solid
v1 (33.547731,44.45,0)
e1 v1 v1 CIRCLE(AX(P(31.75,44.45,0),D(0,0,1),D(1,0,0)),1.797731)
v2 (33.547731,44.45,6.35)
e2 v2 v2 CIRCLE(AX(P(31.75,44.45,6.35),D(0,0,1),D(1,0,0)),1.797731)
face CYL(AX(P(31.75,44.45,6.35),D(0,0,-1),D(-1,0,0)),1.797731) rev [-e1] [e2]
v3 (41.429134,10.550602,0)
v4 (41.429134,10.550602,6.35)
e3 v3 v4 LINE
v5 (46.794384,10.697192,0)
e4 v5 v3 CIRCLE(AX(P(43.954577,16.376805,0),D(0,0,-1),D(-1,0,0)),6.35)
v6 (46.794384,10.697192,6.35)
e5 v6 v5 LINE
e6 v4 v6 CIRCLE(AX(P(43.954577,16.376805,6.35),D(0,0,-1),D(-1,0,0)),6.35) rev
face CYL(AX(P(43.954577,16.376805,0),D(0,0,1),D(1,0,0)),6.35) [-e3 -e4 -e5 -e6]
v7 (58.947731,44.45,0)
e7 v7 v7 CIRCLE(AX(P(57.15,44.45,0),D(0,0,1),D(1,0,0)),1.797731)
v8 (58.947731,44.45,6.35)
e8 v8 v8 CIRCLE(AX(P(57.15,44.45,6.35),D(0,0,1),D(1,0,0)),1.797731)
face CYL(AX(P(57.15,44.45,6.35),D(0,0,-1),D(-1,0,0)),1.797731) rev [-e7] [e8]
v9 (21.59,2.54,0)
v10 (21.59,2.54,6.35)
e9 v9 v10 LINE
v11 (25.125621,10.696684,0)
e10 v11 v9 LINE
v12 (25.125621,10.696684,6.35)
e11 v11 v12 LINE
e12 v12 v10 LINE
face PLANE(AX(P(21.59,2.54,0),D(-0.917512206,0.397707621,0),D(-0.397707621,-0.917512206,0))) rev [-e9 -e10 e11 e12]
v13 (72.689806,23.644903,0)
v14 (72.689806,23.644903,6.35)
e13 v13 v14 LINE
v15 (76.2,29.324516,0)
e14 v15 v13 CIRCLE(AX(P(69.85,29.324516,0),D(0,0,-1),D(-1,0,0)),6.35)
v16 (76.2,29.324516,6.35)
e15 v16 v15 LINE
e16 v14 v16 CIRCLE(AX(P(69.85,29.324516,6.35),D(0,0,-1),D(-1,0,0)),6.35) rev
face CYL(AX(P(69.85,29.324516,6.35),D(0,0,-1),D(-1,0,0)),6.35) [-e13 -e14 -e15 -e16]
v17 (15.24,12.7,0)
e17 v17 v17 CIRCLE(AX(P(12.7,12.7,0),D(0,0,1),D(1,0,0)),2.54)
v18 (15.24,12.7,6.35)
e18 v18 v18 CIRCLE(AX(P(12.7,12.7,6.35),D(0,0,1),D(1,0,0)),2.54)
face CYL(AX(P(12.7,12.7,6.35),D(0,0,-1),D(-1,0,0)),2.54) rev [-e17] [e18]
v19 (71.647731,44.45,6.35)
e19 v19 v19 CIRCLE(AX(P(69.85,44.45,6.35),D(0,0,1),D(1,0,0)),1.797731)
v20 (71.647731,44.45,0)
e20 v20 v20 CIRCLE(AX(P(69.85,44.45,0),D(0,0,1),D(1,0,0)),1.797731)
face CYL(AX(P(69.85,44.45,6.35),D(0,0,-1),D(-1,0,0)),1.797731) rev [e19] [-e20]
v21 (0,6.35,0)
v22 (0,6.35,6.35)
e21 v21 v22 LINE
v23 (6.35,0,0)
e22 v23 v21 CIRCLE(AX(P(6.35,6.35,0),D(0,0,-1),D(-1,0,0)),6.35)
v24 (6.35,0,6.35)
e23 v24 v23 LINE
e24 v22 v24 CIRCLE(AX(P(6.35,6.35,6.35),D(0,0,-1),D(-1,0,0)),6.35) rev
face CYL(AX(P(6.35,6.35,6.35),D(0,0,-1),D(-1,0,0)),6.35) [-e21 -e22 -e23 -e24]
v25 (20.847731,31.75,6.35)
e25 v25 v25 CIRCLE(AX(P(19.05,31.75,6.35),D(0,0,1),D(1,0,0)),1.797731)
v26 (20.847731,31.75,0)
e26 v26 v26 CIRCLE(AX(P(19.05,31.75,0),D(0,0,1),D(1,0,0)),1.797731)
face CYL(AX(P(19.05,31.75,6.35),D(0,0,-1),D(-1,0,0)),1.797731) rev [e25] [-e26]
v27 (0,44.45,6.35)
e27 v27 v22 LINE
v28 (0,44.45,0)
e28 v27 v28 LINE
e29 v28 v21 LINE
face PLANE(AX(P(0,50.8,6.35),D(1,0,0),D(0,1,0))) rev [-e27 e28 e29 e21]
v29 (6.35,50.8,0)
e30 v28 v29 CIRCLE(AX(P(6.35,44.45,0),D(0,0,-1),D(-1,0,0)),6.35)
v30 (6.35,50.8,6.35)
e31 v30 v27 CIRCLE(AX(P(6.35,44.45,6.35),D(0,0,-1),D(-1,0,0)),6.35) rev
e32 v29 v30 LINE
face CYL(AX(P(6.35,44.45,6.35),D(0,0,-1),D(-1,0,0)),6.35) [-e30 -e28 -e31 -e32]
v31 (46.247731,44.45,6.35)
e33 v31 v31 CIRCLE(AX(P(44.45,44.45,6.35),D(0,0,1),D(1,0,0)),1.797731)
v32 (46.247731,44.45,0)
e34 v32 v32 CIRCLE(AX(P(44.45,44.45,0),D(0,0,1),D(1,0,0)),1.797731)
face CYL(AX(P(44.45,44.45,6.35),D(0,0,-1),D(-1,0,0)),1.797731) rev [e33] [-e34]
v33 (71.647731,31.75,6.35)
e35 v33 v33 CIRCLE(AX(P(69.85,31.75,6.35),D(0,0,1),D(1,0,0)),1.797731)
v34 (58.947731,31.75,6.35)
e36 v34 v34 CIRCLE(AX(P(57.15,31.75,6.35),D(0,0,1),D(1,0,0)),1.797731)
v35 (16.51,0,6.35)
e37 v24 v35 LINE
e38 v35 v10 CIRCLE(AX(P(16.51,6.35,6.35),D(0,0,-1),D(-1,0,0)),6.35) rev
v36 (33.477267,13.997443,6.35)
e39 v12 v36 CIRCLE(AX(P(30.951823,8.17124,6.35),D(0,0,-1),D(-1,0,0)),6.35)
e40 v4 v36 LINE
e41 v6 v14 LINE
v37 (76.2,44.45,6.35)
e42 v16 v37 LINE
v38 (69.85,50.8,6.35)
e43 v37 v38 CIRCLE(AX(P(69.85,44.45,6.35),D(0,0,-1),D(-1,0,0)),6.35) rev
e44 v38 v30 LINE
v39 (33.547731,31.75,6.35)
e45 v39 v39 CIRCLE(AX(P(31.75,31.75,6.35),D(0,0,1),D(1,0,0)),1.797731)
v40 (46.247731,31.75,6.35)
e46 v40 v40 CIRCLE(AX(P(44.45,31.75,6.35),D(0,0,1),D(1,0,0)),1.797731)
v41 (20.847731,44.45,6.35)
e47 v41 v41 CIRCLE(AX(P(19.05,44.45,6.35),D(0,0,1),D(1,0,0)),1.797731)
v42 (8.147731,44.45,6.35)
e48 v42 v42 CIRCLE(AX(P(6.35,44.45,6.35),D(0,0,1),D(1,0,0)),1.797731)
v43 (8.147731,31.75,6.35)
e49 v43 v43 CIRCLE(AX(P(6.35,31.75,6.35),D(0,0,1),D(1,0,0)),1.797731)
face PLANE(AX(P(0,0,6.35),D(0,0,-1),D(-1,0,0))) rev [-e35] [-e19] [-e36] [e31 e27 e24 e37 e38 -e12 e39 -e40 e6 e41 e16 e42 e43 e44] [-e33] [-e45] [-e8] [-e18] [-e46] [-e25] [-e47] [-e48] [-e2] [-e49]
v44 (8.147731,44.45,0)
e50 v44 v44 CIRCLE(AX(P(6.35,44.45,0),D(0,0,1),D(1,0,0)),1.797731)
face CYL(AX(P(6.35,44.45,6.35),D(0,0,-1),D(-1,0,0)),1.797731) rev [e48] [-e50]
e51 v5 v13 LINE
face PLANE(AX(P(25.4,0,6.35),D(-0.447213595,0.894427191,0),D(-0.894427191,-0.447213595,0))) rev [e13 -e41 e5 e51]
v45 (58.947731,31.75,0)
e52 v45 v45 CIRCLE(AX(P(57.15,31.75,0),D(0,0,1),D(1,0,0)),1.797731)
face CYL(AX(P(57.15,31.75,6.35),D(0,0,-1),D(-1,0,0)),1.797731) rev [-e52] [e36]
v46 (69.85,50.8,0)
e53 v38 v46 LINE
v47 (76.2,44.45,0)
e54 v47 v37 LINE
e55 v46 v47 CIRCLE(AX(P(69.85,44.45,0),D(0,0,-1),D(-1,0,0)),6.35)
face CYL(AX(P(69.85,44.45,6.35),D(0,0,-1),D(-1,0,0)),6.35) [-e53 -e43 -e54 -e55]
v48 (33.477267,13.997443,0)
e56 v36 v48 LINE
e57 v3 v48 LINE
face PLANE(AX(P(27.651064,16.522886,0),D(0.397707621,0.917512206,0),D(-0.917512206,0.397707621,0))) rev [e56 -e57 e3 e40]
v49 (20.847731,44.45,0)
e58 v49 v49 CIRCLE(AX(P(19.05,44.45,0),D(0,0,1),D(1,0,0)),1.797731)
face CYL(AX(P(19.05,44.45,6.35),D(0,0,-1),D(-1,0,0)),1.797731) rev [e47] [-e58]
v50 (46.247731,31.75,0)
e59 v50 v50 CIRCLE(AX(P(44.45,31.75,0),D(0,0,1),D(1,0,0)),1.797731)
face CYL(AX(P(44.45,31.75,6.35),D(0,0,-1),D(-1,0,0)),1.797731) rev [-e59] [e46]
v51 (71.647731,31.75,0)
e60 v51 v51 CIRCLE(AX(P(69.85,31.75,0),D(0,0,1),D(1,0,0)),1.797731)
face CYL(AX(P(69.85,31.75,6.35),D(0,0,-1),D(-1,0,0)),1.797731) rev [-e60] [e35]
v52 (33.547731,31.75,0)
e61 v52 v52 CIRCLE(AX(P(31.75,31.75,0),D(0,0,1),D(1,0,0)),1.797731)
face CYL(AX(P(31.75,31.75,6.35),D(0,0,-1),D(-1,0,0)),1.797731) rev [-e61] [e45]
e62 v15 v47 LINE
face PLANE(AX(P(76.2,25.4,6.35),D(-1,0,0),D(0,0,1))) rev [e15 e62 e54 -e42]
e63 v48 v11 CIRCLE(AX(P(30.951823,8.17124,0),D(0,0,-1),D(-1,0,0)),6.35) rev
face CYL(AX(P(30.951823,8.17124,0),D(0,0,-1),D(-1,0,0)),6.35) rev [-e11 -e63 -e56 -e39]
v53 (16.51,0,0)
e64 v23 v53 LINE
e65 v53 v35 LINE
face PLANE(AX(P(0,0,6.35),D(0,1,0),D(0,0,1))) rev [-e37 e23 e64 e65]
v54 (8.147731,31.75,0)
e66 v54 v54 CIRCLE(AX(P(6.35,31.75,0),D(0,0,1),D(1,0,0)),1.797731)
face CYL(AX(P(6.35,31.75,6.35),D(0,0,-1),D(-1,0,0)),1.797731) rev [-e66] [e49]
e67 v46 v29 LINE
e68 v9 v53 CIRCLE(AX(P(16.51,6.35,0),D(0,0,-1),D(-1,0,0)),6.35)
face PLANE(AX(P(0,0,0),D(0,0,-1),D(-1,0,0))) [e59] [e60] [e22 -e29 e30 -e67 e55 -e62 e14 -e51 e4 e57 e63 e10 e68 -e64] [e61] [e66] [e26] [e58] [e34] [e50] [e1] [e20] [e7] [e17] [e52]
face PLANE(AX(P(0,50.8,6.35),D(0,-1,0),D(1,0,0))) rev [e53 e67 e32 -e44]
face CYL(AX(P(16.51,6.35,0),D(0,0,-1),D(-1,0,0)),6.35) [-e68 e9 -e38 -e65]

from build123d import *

# Parameters (mm, degrees)
SKETCH1_R           = 2.54
SKETCH1_R_2         = 1.797730585
BOSS_EXTRUDE1_DEPTH = 6.35
CUT_EXTRUDE1_DEPTH  = 92.800885072
FILLET1_R           = 6.35


with BuildPart() as part:
    # Sketch1 → Boss-Extrude1 (new body)
    with BuildSketch(Plane.XY):
        Polygon((25.4, 0), (76.2, 25.4), (76.2, 50.8), (0, 50.8), (0, 0), align=None)
        with Locations((12.7, 12.7)):
            Circle(SKETCH1_R, mode=Mode.SUBTRACT)
        with Locations((69.85, 44.45)):
            Circle(SKETCH1_R_2, mode=Mode.SUBTRACT)
        with Locations((57.15, 44.45)):
            Circle(SKETCH1_R_2, mode=Mode.SUBTRACT)
        with Locations((44.45, 44.45)):
            Circle(SKETCH1_R_2, mode=Mode.SUBTRACT)
        with Locations((31.75, 44.45)):
            Circle(SKETCH1_R_2, mode=Mode.SUBTRACT)
        with Locations((19.05, 44.45)):
            Circle(SKETCH1_R_2, mode=Mode.SUBTRACT)
        with Locations((6.35, 44.45)):
            Circle(SKETCH1_R_2, mode=Mode.SUBTRACT)
        with Locations((57.15, 31.75)):
            Circle(SKETCH1_R_2, mode=Mode.SUBTRACT)
        with Locations((44.45, 31.75)):
            Circle(SKETCH1_R_2, mode=Mode.SUBTRACT)
        with Locations((31.75, 31.75)):
            Circle(SKETCH1_R_2, mode=Mode.SUBTRACT)
        with Locations((19.05, 31.75)):
            Circle(SKETCH1_R_2, mode=Mode.SUBTRACT)
        with Locations((6.35, 31.75)):
            Circle(SKETCH1_R_2, mode=Mode.SUBTRACT)
        with Locations((69.85, 31.75)):
            Circle(SKETCH1_R_2, mode=Mode.SUBTRACT)
    extrude(amount=BOSS_EXTRUDE1_DEPTH)

    # Sketch2 → Cut-Extrude1 (cut, through all)
    with BuildSketch(Plane.XY.offset(6.35)):
        Polygon((21.59, 0), (21.59, 2.54), (27.65106415, 16.522886017), (44.145936938, 9.372968469), (25.4, 0), align=None)
    extrude(amount=-CUT_EXTRUDE1_DEPTH, mode=Mode.SUBTRACT)

    # Fillet1
    # the kernel refuses this fillet: 6.35 mm, written as the material it adds along each edge
    with BuildSketch(Plane(origin=(27.65106415, 16.522886017, 6.35), x_dir=(0.9175122058614823, -0.397707621369263, 0), z_dir=(0, 0, -1))) as fillet1_piece_1:
        with BuildLine():
            CenterArc((FILLET1_R, FILLET1_R), FILLET1_R, 180, 90)
            Line((0, FILLET1_R), (0, 0))
            Line((0, 0), (FILLET1_R, 0))
        make_face()
    extrude(amount=6.35)
    # the kernel refuses this fillet: 6.35 mm, written as the material it takes off along each edge
    with BuildSketch(Plane(origin=(44.145936938, 9.372968469, 13.752634073), x_dir=(0.8944271909999154, 0.4472135954999589, 0), z_dir=(0, 0, -1))) as fillet1_2_piece_1:
        with BuildLine():
            CenterArc((FILLET1_R * 0.466307658155, -FILLET1_R), FILLET1_R, 90, 50)
            Line((-FILLET1_R * 0.299736784964, -FILLET1_R * 0.357212390313), (0, 0))
            Line((0, 0), (FILLET1_R * 0.466307658155, 0))
        make_face()
    extrude(amount=21.155268146, mode=Mode.SUBTRACT)
    with BuildSketch(Plane(origin=(76.2, 25.4, -9.811289571), x_dir=(-0.8944271909999166, -0.4472135954999565, 0), z_dir=(0, 0, 1))) as fillet1_2_piece_2:
        with BuildLine():
            CenterArc((FILLET1_R * 0.61803398875, -FILLET1_R), FILLET1_R, 90, 63.434948823)
            Line((-FILLET1_R * 0.27639320225, -FILLET1_R * 0.5527864045), (0, 0))
            Line((0, 0), (FILLET1_R * 0.61803398875, 0))
        make_face()
    extrude(amount=25.972579143, mode=Mode.SUBTRACT)
    with BuildSketch(Plane(origin=(76.2, 50.8, -15.875), x_dir=(0, -1, 0), z_dir=(0, 0, 1))) as fillet1_2_piece_3:
        with BuildLine():
            CenterArc((FILLET1_R, -FILLET1_R), FILLET1_R, 90, 90)
            Line((0, -FILLET1_R), (0, 0))
            Line((0, 0), (FILLET1_R, 0))
        make_face()
    extrude(amount=38.1, mode=Mode.SUBTRACT)
    with BuildSketch(Plane(origin=(0, 50.8, -15.875), x_dir=(0, -1, 0), z_dir=(0, 0, 1)), Plane(origin=(0, 0, -15.875), x_dir=(1, 0, 0), z_dir=(0, 0, 1))) as fillet1_2_piece_4:
        with BuildLine():
            CenterArc((FILLET1_R, FILLET1_R), FILLET1_R, 180, 90)
            Line((0, FILLET1_R), (0, 0))
            Line((0, 0), (FILLET1_R, 0))
        make_face()
    extrude(amount=38.1, mode=Mode.SUBTRACT)
    with BuildSketch(Plane(origin=(21.59, 0, 19.05), x_dir=(0, 1, 0), z_dir=(0, 0, -1))) as fillet1_2_piece_5:
        with BuildLine():
            CenterArc((6.35, -5.08), FILLET1_R, 126.869897646, 53.130102354)
            Line((0, -5.08), (0, 0))
            Line((0, 0), (2.54, 0))
        make_face()
    extrude(amount=31.75, mode=Mode.SUBTRACT)


solid = part.part
